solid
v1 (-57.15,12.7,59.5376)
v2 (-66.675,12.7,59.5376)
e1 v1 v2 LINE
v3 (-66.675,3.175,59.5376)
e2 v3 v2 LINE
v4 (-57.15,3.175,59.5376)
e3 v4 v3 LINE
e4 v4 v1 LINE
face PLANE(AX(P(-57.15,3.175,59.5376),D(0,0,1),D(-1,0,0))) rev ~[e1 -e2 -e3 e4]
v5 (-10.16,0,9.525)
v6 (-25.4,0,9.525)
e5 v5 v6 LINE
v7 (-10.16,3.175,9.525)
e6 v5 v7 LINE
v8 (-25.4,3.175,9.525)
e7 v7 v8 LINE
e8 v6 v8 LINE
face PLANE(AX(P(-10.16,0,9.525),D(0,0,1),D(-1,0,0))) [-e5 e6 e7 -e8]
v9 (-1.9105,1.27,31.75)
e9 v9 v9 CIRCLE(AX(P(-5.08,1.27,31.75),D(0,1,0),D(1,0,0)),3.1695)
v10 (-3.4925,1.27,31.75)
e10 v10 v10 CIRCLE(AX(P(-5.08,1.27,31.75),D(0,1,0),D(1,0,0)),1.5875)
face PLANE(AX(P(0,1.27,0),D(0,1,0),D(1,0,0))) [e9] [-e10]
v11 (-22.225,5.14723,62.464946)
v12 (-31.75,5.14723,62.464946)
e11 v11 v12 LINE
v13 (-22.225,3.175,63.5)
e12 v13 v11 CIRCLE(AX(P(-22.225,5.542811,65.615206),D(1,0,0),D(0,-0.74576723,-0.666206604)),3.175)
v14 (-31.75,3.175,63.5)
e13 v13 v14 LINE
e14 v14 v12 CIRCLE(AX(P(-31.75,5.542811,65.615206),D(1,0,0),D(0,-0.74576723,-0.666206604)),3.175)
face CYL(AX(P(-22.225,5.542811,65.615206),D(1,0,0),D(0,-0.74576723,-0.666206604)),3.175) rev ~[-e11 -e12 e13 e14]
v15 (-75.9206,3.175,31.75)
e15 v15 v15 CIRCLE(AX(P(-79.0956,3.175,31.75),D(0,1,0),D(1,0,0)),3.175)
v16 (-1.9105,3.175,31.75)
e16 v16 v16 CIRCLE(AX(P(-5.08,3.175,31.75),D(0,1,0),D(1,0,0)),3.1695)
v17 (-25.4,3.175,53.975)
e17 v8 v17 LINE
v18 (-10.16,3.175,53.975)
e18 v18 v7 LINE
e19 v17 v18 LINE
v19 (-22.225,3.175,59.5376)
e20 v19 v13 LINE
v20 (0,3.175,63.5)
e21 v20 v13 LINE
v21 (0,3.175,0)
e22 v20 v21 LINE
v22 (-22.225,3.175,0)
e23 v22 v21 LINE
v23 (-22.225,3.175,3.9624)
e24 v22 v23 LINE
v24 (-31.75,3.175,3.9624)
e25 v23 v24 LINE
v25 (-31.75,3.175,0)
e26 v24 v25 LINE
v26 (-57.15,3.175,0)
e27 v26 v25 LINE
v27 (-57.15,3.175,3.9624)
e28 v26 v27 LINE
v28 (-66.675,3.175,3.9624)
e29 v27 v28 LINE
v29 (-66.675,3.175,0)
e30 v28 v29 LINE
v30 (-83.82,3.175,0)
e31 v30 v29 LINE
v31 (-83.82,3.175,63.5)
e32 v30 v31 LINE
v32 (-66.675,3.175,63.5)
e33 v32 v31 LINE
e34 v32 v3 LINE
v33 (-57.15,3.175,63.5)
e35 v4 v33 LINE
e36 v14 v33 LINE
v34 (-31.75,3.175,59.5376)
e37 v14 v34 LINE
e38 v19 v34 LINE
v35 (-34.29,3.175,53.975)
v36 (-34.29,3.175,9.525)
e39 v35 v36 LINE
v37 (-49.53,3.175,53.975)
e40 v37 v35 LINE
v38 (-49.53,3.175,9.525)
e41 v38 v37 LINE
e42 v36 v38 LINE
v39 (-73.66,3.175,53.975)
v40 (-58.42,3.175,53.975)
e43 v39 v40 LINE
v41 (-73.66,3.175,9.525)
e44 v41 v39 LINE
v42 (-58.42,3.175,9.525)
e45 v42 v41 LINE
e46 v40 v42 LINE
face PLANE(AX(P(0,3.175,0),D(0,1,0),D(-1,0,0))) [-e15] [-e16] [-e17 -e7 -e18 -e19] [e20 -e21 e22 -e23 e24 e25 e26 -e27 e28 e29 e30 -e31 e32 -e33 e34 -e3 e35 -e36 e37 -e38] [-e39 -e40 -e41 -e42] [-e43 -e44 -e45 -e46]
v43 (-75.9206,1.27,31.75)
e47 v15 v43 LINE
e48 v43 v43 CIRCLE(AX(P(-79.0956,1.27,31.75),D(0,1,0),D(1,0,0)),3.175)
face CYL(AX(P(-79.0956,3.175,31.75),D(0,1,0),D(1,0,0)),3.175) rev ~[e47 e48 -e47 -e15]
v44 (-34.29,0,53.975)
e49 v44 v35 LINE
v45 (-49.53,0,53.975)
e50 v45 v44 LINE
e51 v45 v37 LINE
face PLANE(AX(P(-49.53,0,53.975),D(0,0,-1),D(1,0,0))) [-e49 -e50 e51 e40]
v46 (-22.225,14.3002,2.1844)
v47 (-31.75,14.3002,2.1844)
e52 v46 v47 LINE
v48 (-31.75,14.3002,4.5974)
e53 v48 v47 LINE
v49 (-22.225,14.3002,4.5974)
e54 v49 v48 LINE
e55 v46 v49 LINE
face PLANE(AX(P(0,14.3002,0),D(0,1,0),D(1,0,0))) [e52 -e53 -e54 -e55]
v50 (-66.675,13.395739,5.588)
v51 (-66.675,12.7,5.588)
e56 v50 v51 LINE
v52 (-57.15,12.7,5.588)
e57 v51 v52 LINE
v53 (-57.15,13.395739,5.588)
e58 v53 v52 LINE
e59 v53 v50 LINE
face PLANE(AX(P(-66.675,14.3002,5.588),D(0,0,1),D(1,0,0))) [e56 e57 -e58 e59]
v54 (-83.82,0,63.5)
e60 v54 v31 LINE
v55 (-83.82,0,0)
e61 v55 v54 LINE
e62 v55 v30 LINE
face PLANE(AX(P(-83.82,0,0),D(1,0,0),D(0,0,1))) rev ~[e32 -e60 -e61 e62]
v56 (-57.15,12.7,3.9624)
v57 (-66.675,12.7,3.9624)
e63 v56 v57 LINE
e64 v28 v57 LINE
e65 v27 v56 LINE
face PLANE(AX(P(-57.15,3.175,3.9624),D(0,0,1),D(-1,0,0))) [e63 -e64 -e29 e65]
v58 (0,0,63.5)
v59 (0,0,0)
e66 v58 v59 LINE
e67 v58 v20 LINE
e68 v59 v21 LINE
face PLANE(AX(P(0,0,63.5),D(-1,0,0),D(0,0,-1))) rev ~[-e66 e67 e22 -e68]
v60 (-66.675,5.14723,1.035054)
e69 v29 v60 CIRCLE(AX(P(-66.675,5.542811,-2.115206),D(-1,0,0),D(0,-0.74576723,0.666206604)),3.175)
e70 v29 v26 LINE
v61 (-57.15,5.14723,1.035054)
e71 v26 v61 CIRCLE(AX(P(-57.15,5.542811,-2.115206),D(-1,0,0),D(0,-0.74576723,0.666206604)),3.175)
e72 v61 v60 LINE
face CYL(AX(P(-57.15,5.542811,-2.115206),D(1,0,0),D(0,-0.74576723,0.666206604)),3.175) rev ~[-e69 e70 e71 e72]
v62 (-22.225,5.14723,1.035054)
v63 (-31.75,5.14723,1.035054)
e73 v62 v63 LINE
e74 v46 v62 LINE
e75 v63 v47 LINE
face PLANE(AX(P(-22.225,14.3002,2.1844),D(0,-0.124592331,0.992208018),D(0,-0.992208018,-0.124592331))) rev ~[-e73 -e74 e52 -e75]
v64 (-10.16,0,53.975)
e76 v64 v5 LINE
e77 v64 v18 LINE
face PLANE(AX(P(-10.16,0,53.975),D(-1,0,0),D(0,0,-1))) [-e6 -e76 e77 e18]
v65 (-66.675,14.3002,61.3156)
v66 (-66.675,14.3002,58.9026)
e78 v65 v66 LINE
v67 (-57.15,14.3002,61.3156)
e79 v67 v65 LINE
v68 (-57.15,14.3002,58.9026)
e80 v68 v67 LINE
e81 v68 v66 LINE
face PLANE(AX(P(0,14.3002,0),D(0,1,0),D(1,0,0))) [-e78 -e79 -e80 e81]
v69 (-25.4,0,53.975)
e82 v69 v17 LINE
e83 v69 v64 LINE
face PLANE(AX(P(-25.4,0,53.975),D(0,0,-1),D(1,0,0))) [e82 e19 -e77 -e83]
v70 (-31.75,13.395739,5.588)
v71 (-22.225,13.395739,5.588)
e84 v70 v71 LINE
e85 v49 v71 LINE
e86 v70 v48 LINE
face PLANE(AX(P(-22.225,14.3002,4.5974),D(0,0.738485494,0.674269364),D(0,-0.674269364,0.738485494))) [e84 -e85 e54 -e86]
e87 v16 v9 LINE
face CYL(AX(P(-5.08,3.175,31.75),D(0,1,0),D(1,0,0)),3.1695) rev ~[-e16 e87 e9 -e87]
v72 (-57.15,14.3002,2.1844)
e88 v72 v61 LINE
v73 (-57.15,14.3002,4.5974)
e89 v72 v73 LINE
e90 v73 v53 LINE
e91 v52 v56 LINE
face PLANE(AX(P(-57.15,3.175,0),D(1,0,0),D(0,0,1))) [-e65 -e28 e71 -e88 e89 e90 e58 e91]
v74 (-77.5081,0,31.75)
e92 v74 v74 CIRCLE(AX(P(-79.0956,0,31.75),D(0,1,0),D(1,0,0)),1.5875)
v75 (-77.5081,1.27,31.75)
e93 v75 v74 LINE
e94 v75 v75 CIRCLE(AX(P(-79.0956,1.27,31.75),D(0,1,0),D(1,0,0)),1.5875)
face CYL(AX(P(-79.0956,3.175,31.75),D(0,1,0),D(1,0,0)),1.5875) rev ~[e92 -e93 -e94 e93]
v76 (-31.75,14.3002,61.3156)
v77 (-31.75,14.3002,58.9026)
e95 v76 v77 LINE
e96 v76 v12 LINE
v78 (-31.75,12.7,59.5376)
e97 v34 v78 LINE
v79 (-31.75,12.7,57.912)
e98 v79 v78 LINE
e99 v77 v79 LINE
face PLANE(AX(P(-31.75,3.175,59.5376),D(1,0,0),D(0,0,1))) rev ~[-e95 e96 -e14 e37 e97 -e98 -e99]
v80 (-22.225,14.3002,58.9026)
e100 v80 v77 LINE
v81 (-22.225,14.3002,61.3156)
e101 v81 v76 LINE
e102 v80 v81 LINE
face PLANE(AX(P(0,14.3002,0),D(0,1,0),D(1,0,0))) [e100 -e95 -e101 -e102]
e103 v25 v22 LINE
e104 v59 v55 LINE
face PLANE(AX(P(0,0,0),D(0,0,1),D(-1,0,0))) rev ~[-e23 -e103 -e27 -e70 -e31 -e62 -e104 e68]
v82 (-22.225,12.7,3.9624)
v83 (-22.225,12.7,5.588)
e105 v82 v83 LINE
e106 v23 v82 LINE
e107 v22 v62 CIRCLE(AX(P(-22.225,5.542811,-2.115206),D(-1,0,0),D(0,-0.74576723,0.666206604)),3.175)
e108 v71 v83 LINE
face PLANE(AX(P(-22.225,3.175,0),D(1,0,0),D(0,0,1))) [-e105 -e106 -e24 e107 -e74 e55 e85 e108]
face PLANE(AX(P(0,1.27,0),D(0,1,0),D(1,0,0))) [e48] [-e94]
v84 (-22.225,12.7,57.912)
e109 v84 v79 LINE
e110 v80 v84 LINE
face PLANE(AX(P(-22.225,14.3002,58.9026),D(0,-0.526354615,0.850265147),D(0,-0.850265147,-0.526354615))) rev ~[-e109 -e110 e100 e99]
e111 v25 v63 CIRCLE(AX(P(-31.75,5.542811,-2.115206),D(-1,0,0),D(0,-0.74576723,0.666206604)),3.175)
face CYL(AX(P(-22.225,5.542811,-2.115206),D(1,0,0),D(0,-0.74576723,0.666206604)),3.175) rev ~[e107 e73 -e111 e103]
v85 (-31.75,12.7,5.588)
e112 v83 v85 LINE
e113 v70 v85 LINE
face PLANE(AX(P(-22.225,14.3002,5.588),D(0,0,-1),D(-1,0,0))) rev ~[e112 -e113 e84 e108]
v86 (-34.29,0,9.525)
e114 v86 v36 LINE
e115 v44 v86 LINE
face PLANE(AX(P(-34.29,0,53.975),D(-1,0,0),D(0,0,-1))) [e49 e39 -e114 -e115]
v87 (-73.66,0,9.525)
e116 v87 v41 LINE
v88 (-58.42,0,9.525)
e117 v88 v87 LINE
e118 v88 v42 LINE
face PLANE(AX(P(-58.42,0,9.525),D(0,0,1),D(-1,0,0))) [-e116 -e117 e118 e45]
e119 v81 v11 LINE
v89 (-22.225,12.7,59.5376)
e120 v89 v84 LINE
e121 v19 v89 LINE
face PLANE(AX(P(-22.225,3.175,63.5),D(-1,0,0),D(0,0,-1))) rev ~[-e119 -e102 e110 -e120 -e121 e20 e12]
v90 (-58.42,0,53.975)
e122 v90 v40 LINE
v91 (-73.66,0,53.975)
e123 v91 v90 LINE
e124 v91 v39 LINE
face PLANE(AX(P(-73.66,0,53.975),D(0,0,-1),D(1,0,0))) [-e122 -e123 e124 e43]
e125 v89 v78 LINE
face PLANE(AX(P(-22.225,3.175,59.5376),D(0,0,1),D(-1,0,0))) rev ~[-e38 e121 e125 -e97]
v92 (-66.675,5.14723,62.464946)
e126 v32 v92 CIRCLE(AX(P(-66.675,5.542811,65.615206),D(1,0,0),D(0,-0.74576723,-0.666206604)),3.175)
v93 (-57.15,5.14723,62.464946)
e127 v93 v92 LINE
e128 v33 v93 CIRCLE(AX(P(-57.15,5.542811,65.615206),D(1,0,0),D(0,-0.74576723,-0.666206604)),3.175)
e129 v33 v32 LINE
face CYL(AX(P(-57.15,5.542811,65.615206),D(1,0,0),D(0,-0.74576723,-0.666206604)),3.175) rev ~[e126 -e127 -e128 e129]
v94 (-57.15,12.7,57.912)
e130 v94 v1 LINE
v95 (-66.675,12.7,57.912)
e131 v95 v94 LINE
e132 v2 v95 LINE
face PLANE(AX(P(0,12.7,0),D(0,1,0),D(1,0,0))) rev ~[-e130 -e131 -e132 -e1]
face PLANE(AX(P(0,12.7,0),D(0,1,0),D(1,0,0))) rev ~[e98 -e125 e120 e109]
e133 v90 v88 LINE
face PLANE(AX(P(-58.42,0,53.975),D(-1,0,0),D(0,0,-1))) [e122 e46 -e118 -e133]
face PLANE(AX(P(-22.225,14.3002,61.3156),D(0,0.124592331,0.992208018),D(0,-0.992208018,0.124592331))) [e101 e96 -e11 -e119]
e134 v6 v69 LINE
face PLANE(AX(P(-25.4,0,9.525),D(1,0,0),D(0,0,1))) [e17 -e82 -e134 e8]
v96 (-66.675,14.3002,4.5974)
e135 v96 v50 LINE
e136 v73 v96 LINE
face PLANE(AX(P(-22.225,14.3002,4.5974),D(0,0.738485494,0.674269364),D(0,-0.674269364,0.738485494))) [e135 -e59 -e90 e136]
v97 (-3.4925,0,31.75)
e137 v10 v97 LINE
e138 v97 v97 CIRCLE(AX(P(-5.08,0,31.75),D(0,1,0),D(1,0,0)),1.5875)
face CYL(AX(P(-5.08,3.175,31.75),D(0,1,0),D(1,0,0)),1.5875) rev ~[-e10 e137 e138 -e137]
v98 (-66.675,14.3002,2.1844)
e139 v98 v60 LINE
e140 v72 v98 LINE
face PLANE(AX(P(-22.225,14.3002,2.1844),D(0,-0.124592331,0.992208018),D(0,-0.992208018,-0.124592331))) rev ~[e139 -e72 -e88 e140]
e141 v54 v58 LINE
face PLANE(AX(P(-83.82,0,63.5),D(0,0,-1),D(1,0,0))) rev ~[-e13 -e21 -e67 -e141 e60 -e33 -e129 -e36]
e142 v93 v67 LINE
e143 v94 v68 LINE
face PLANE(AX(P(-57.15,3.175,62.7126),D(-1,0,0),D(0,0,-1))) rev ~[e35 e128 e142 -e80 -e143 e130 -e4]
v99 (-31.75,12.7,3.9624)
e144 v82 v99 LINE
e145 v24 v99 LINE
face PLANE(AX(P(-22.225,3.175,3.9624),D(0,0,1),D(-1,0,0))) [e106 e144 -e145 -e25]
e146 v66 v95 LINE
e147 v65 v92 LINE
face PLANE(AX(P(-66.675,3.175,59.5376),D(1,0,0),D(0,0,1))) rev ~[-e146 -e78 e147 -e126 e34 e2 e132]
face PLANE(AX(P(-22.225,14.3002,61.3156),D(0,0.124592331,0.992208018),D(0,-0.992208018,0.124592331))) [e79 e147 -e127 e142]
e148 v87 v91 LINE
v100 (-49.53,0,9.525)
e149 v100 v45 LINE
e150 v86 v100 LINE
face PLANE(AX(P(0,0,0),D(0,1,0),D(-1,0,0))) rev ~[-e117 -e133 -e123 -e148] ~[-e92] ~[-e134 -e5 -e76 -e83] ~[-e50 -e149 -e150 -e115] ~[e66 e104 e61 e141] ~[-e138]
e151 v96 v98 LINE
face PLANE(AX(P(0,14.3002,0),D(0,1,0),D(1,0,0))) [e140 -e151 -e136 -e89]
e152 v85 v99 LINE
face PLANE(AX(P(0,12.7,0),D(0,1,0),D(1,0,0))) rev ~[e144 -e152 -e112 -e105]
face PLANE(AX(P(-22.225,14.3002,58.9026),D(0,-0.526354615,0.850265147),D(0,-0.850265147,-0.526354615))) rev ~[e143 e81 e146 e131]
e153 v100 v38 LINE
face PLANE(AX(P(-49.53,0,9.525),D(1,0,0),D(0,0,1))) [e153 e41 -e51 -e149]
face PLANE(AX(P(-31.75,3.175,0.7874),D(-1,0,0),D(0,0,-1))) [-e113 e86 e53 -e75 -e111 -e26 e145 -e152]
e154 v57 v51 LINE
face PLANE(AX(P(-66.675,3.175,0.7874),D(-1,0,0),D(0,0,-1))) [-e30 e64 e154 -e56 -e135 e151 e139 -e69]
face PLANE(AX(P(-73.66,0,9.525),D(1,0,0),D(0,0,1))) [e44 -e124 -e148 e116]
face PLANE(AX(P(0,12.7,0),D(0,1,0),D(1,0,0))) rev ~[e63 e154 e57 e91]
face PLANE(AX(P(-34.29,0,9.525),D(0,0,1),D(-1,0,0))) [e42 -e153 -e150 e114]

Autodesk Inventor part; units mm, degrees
ref_plane "YZ Plane" through (0, 0, 0) normal (1, 0, 0) x (0, 1, 0)
ref_plane "XZ Plane" through (0, 0, 0) normal (0, 1, 0) x (-1, 0, 0)
ref_plane "XY Plane" through (0, 0, 0) normal (0, 0, 1) x (1, 0, 0)
sketch "Sketch1" plane through (0, 0, 0) normal (0, 1, 0) x (-1, 0, 0)
  line L0 (0, 0) -> (83.82, 0)
  line L1 (83.82, 0) -> (83.82, 63.5)
  line L2 (83.82, 63.5) -> (0, 63.5)
  line L3 (0, 63.5) -> (0, 0)
  line L4 (73.66, 53.975) -> (58.42, 53.975)
  line L5 (58.42, 53.975) -> (58.42, 9.525)
  line L6 (58.42, 9.525) -> (73.66, 9.525)
  line L7 (73.66, 9.525) -> (73.66, 53.975)
  line L8 (49.53, 53.975) -> (34.29, 53.975)
  line L9 (34.29, 53.975) -> (34.29, 9.525)
  line L10 (34.29, 9.525) -> (49.53, 9.525)
  line L11 (49.53, 9.525) -> (49.53, 53.975)
  line L12 (25.4, 53.975) -> (10.16, 53.975)
  line L13 (10.16, 53.975) -> (10.16, 9.525)
  line L14 (10.16, 9.525) -> (25.4, 9.525)
  line L15 (25.4, 9.525) -> (25.4, 53.975)
  dimension "d0" = 83.82
  dimension "d1" = 63.5
  dimension "d41" = 10.16
  dimension "d42" = 8.89
  dimension "d43" = 8.89
  dimension "d44" = 15.24
  dimension "d45" = 15.24
  dimension "d46" = 15.24
extrude "Extrusion1" add sketch "Sketch1" along normal blind 3.175
sketch "Sketch4" plane through (0, 3.175, 0) normal (0, 1, 0) x (1, 0, 0)
  line L0 (-83.82, -63.5) -> (0, -63.5) projected
  line L1 (0, 0) -> (-83.82, 0) projected
  line L2 (-66.675, 0) -> (-57.15, 0)
  line L3 (-57.15, 0) -> (-57.15, -3.9624)
  line L4 (-57.15, -3.9624) -> (-66.675, -3.9624)
  line L5 (-66.675, -3.9624) -> (-66.675, 0)
  line L6 (-31.75, 0) -> (-22.225, 0)
  line L7 (-22.225, 0) -> (-22.225, -3.9624)
  line L8 (-22.225, -3.9624) -> (-31.75, -3.9624)
  line L9 (-31.75, -3.9624) -> (-31.75, 0)
  line L10 (-66.675, -63.5) -> (-57.15, -63.5)
  line L11 (-57.15, -63.5) -> (-57.15, -59.5376)
  line L12 (-57.15, -59.5376) -> (-66.675, -59.5376)
  line L13 (-66.675, -59.5376) -> (-66.675, -63.5)
  line L14 (-31.75, -63.5) -> (-22.225, -63.5)
  line L15 (-22.225, -63.5) -> (-22.225, -59.5376)
  line L16 (-22.225, -59.5376) -> (-31.75, -59.5376)
  line L17 (-31.75, -59.5376) -> (-31.75, -63.5)
extrude "Extrusion4" add sketch "Sketch4" along normal blind 11.1252
sketch "Sketch5" plane through (-22.225, 3.175, 63.5) normal (1, 0, 0) x (0, 0, -1)
  line L0 (3.9624, 0) -> (0, 0) projected
  line L1 (3.9624, 0) -> (3.9624, 11.1252) projected
  line L2 (0, 11.1252) -> (3.9624, 11.1252) projected
  line L3 (0, 0) -> (0, 11.1252) projected
  line L4 (3.9624, 12.7) -> (2.1844, 12.7)
  line L5 (3.9624, -0.6232) -> (0.7874, -0.6232)
  line L6 (2.1844, 11.1252) -> (0.7874, 0)
  line L7 (0.7874, 0) -> (0, 0)
  line L8 (0, 0) -> (0, 11.1252)
  line L9 (0, 11.1252) -> (2.1844, 11.1252)
  line L10 (59.5376, 0) -> (63.5, 0)
  line L11 (59.5376, 0) -> (59.5376, 11.1252)
  line L12 (63.5, 11.1252) -> (59.5376, 11.1252)
  line L13 (63.5, 0) -> (63.5, 11.1252)
  line L14 (59.5376, 12.7) -> (61.3156, 12.7)
  line L15 (59.5376, -0.6232) -> (62.7126, -0.6232)
  line L16 (61.3156, 11.1252) -> (62.7126, 0)
  line L17 (62.7126, 0) -> (63.5, 0)
  line L18 (63.5, 0) -> (63.5, 11.1252)
  line L19 (63.5, 11.1252) -> (61.3156, 11.1252)
  point P0 (63.5, -3.175)
  dimension "d17" = 1.778
  dimension "d18" = 3.175
extrude "Extrusion5" cut sketch "Sketch5" against normal blind 44.45 contours L0 L3 L2 L6 | L16 L12 L13 L10
fillet "Fillet1" radius 3.175 4 edges at (-61.9125, 3.175, 62.7126) (-26.9875, 3.175, 62.7126) (-26.9875, 3.175, 0.7874) (-61.9125, 3.175, 0.7874)
sketch "Sketch6" plane through (0, 14.3002, 0) normal (0, 1, 0) x (1, 0, 0)
  line L0 (-22.225, -59.5376) -> (-31.75, -59.5376) projected
  line L1 (-31.75, -59.5376) -> (-22.225, -59.5376)
  line L2 (-22.225, -59.5376) -> (-22.225, -57.912)
  line L3 (-22.225, -57.912) -> (-31.75, -57.912)
  line L4 (-31.75, -57.912) -> (-31.75, -59.5376)
  line L5 (-57.15, -59.5376) -> (-66.675, -59.5376)
  line L6 (-66.675, -59.5376) -> (-66.675, -57.912)
  line L7 (-66.675, -57.912) -> (-57.15, -57.912)
  line L8 (-57.15, -57.912) -> (-57.15, -59.5376)
  line L9 (-31.75, -2.1844) -> (-22.225, -2.1844)
  line L10 (-22.225, -2.1844) -> (-22.225, -3.9624)
  line L11 (-22.225, -3.9624) -> (-31.75, -3.9624)
  line L12 (-31.75, -3.9624) -> (-31.75, -2.1844)
  line L13 (-31.75, -3.9624) -> (-22.225, -3.9624)
  line L14 (-22.225, -3.9624) -> (-22.225, -5.588)
  line L15 (-22.225, -5.588) -> (-31.75, -5.588)
  line L16 (-31.75, -5.588) -> (-31.75, -3.9624)
  line L17 (-57.15, -3.9624) -> (-66.675, -3.9624)
  line L18 (-66.675, -3.9624) -> (-66.675, -5.588)
  line L19 (-66.675, -5.588) -> (-57.15, -5.588)
  line L20 (-57.15, -5.588) -> (-57.15, -3.9624)
  line L21 (-66.675, -3.9624) -> (-57.15, -3.9624) projected
  point P0 (0, 0)
  dimension "d50" = 1.6256
  dimension "d51" = 1.6256
  dimension "d52" = 1.6256
  dimension "d53" = 1.6256
  dimension "d54" = 0
extrude "Extrusion6" add sketch "Sketch6" against normal blind 1.6002 contours L0 L4 L3 L2 | L5 L6 L7 L8 | L11 L14 L15 L16 | L20 L19 L18 L17
sketch "Sketch7" plane through (-22.225, 3.175, 63.5) normal (1, 0, 0) x (0, 0, -1)
  line L0 (5.588, 11.1252) -> (5.588, 9.525) projected
  line L1 (2.1844, 11.1252) -> (5.588, 11.1252) projected
  line L2 (4.5974, 11.1252) -> (5.588, 9.525)
  line L3 (4.5974, 11.1252) -> (5.588, 11.1252)
  line L4 (5.588, 9.525) -> (5.588, 11.1252)
  line L5 (61.3156, 11.1252) -> (62.4649, 1.9722)
  arc A0 (62.4649, 1.9722) -> (63.5, 0) centre (65.6152, 2.3678) ccw
  line L6 (59.5376, 0) -> (63.5, 0)
  line L7 (59.5376, 0) -> (59.5376, 9.525)
  line L8 (57.15, 9.525) -> (59.5376, 9.525)
  line L9 (57.15, 11.1252) -> (57.15, 9.525)
  line L10 (61.3156, 11.1252) -> (57.15, 11.1252)
  line L11 (58.9026, 11.1252) -> (57.15, 9.525)
  line L12 (58.9026, 11.1252) -> (57.15, 11.1252)
  line L13 (57.15, 9.525) -> (57.15, 11.1252)
  point P0 (63.5, -3.175)
extrude "Extrusion7" cut sketch "Sketch7" against normal blind 44.45 contours L0 L2 L1 | L11 L9 L10
sketch "Sketch8" plane through (0, 3.175, 0) normal (0, 1, 0) x (1, 0, 0)
  circle A0 centre (-79.0956, -31.75) radius 3.175
  circle A1 centre (-5.08, -31.75) radius 3.1695
  line L0 (0, -63.5) -> (0, 0) projected
  line L1 (-66.675, 0) -> (-83.82, 0) projected
  line L2 (0, 0) -> (-22.225, 0) projected
  dimension "d29" = 74.0156
  dimension "d47" = 5.08
  dimension "d48" = 31.75
  dimension "d49" = 31.75
extrude "Extrusion8" cut sketch "Sketch8" against normal blind 1.905
sketch "Sketch9" plane through (0, 3.175, 0) normal (0, 1, 0) x (1, 0, 0)
  circle A0 centre (-5.08, -31.75) radius 3.1695 projected
  circle A1 centre (-79.0956, -31.75) radius 3.175 projected
  circle A2 centre (-79.0956, -31.75) radius 1.5875
  circle A3 centre (-5.08, -31.75) radius 1.5875
extrude "Extrusion9" cut sketch "Sketch9" against normal blind 3.175 contours A2 | A3
sketch "Sketch12" plane through (0, 12.7, 0) normal (0, -1, 0) x (1, 0, 0)
  line L0 (-22.225, 3.9624) -> (-22.225, 5.588) projected
  line L1 (-22.225, 5.588) -> (-31.75, 5.588) projected
  line L2 (-22.225, 3.9624) -> (-31.75, 3.9624)
  line L3 (-31.75, 3.9624) -> (-31.75, 5.588)
  line L4 (-31.75, 5.588) -> (-22.225, 5.588)
  line L5 (-22.225, 5.588) -> (-22.225, 3.9624)
  line L6 (-57.15, 3.9624) -> (-66.675, 3.9624) projected
  line L7 (-57.15, 5.588) -> (-66.675, 5.588) projected
  line L8 (-57.15, 3.9624) -> (-66.675, 3.9624)
  line L9 (-66.675, 3.9624) -> (-66.675, 5.588)
  line L10 (-66.675, 5.588) -> (-57.15, 5.588)
  line L11 (-57.15, 5.588) -> (-57.15, 3.9624)
  line L12 (-66.675, 57.912) -> (-57.15, 57.912) projected
  line L13 (-57.15, 59.5376) -> (-66.675, 59.5376)
  line L14 (-66.675, 59.5376) -> (-66.675, 57.912)
  line L15 (-66.675, 57.912) -> (-57.15, 57.912)
  line L16 (-57.15, 57.912) -> (-57.15, 59.5376)
  line L17 (-31.75, 57.912) -> (-22.225, 57.912) projected
  line L18 (-31.75, 59.5376) -> (-22.225, 59.5376) projected
  line L19 (-22.225, 57.912) -> (-31.75, 57.912)
  line L20 (-31.75, 57.912) -> (-31.75, 59.5376)
  line L21 (-31.75, 59.5376) -> (-22.225, 59.5376)
  line L22 (-22.225, 59.5376) -> (-22.225, 57.912)
  point P0 (0, 0)
equation "\"d43\" = d42"
equation "\"d45\" = d44"
equation "\"d46\" = d44"
equation "\"d51\" = d50"
equation "\"d52\" = d50"
equation "\"d53\" = d50"
properties part number "_3DPrint"
